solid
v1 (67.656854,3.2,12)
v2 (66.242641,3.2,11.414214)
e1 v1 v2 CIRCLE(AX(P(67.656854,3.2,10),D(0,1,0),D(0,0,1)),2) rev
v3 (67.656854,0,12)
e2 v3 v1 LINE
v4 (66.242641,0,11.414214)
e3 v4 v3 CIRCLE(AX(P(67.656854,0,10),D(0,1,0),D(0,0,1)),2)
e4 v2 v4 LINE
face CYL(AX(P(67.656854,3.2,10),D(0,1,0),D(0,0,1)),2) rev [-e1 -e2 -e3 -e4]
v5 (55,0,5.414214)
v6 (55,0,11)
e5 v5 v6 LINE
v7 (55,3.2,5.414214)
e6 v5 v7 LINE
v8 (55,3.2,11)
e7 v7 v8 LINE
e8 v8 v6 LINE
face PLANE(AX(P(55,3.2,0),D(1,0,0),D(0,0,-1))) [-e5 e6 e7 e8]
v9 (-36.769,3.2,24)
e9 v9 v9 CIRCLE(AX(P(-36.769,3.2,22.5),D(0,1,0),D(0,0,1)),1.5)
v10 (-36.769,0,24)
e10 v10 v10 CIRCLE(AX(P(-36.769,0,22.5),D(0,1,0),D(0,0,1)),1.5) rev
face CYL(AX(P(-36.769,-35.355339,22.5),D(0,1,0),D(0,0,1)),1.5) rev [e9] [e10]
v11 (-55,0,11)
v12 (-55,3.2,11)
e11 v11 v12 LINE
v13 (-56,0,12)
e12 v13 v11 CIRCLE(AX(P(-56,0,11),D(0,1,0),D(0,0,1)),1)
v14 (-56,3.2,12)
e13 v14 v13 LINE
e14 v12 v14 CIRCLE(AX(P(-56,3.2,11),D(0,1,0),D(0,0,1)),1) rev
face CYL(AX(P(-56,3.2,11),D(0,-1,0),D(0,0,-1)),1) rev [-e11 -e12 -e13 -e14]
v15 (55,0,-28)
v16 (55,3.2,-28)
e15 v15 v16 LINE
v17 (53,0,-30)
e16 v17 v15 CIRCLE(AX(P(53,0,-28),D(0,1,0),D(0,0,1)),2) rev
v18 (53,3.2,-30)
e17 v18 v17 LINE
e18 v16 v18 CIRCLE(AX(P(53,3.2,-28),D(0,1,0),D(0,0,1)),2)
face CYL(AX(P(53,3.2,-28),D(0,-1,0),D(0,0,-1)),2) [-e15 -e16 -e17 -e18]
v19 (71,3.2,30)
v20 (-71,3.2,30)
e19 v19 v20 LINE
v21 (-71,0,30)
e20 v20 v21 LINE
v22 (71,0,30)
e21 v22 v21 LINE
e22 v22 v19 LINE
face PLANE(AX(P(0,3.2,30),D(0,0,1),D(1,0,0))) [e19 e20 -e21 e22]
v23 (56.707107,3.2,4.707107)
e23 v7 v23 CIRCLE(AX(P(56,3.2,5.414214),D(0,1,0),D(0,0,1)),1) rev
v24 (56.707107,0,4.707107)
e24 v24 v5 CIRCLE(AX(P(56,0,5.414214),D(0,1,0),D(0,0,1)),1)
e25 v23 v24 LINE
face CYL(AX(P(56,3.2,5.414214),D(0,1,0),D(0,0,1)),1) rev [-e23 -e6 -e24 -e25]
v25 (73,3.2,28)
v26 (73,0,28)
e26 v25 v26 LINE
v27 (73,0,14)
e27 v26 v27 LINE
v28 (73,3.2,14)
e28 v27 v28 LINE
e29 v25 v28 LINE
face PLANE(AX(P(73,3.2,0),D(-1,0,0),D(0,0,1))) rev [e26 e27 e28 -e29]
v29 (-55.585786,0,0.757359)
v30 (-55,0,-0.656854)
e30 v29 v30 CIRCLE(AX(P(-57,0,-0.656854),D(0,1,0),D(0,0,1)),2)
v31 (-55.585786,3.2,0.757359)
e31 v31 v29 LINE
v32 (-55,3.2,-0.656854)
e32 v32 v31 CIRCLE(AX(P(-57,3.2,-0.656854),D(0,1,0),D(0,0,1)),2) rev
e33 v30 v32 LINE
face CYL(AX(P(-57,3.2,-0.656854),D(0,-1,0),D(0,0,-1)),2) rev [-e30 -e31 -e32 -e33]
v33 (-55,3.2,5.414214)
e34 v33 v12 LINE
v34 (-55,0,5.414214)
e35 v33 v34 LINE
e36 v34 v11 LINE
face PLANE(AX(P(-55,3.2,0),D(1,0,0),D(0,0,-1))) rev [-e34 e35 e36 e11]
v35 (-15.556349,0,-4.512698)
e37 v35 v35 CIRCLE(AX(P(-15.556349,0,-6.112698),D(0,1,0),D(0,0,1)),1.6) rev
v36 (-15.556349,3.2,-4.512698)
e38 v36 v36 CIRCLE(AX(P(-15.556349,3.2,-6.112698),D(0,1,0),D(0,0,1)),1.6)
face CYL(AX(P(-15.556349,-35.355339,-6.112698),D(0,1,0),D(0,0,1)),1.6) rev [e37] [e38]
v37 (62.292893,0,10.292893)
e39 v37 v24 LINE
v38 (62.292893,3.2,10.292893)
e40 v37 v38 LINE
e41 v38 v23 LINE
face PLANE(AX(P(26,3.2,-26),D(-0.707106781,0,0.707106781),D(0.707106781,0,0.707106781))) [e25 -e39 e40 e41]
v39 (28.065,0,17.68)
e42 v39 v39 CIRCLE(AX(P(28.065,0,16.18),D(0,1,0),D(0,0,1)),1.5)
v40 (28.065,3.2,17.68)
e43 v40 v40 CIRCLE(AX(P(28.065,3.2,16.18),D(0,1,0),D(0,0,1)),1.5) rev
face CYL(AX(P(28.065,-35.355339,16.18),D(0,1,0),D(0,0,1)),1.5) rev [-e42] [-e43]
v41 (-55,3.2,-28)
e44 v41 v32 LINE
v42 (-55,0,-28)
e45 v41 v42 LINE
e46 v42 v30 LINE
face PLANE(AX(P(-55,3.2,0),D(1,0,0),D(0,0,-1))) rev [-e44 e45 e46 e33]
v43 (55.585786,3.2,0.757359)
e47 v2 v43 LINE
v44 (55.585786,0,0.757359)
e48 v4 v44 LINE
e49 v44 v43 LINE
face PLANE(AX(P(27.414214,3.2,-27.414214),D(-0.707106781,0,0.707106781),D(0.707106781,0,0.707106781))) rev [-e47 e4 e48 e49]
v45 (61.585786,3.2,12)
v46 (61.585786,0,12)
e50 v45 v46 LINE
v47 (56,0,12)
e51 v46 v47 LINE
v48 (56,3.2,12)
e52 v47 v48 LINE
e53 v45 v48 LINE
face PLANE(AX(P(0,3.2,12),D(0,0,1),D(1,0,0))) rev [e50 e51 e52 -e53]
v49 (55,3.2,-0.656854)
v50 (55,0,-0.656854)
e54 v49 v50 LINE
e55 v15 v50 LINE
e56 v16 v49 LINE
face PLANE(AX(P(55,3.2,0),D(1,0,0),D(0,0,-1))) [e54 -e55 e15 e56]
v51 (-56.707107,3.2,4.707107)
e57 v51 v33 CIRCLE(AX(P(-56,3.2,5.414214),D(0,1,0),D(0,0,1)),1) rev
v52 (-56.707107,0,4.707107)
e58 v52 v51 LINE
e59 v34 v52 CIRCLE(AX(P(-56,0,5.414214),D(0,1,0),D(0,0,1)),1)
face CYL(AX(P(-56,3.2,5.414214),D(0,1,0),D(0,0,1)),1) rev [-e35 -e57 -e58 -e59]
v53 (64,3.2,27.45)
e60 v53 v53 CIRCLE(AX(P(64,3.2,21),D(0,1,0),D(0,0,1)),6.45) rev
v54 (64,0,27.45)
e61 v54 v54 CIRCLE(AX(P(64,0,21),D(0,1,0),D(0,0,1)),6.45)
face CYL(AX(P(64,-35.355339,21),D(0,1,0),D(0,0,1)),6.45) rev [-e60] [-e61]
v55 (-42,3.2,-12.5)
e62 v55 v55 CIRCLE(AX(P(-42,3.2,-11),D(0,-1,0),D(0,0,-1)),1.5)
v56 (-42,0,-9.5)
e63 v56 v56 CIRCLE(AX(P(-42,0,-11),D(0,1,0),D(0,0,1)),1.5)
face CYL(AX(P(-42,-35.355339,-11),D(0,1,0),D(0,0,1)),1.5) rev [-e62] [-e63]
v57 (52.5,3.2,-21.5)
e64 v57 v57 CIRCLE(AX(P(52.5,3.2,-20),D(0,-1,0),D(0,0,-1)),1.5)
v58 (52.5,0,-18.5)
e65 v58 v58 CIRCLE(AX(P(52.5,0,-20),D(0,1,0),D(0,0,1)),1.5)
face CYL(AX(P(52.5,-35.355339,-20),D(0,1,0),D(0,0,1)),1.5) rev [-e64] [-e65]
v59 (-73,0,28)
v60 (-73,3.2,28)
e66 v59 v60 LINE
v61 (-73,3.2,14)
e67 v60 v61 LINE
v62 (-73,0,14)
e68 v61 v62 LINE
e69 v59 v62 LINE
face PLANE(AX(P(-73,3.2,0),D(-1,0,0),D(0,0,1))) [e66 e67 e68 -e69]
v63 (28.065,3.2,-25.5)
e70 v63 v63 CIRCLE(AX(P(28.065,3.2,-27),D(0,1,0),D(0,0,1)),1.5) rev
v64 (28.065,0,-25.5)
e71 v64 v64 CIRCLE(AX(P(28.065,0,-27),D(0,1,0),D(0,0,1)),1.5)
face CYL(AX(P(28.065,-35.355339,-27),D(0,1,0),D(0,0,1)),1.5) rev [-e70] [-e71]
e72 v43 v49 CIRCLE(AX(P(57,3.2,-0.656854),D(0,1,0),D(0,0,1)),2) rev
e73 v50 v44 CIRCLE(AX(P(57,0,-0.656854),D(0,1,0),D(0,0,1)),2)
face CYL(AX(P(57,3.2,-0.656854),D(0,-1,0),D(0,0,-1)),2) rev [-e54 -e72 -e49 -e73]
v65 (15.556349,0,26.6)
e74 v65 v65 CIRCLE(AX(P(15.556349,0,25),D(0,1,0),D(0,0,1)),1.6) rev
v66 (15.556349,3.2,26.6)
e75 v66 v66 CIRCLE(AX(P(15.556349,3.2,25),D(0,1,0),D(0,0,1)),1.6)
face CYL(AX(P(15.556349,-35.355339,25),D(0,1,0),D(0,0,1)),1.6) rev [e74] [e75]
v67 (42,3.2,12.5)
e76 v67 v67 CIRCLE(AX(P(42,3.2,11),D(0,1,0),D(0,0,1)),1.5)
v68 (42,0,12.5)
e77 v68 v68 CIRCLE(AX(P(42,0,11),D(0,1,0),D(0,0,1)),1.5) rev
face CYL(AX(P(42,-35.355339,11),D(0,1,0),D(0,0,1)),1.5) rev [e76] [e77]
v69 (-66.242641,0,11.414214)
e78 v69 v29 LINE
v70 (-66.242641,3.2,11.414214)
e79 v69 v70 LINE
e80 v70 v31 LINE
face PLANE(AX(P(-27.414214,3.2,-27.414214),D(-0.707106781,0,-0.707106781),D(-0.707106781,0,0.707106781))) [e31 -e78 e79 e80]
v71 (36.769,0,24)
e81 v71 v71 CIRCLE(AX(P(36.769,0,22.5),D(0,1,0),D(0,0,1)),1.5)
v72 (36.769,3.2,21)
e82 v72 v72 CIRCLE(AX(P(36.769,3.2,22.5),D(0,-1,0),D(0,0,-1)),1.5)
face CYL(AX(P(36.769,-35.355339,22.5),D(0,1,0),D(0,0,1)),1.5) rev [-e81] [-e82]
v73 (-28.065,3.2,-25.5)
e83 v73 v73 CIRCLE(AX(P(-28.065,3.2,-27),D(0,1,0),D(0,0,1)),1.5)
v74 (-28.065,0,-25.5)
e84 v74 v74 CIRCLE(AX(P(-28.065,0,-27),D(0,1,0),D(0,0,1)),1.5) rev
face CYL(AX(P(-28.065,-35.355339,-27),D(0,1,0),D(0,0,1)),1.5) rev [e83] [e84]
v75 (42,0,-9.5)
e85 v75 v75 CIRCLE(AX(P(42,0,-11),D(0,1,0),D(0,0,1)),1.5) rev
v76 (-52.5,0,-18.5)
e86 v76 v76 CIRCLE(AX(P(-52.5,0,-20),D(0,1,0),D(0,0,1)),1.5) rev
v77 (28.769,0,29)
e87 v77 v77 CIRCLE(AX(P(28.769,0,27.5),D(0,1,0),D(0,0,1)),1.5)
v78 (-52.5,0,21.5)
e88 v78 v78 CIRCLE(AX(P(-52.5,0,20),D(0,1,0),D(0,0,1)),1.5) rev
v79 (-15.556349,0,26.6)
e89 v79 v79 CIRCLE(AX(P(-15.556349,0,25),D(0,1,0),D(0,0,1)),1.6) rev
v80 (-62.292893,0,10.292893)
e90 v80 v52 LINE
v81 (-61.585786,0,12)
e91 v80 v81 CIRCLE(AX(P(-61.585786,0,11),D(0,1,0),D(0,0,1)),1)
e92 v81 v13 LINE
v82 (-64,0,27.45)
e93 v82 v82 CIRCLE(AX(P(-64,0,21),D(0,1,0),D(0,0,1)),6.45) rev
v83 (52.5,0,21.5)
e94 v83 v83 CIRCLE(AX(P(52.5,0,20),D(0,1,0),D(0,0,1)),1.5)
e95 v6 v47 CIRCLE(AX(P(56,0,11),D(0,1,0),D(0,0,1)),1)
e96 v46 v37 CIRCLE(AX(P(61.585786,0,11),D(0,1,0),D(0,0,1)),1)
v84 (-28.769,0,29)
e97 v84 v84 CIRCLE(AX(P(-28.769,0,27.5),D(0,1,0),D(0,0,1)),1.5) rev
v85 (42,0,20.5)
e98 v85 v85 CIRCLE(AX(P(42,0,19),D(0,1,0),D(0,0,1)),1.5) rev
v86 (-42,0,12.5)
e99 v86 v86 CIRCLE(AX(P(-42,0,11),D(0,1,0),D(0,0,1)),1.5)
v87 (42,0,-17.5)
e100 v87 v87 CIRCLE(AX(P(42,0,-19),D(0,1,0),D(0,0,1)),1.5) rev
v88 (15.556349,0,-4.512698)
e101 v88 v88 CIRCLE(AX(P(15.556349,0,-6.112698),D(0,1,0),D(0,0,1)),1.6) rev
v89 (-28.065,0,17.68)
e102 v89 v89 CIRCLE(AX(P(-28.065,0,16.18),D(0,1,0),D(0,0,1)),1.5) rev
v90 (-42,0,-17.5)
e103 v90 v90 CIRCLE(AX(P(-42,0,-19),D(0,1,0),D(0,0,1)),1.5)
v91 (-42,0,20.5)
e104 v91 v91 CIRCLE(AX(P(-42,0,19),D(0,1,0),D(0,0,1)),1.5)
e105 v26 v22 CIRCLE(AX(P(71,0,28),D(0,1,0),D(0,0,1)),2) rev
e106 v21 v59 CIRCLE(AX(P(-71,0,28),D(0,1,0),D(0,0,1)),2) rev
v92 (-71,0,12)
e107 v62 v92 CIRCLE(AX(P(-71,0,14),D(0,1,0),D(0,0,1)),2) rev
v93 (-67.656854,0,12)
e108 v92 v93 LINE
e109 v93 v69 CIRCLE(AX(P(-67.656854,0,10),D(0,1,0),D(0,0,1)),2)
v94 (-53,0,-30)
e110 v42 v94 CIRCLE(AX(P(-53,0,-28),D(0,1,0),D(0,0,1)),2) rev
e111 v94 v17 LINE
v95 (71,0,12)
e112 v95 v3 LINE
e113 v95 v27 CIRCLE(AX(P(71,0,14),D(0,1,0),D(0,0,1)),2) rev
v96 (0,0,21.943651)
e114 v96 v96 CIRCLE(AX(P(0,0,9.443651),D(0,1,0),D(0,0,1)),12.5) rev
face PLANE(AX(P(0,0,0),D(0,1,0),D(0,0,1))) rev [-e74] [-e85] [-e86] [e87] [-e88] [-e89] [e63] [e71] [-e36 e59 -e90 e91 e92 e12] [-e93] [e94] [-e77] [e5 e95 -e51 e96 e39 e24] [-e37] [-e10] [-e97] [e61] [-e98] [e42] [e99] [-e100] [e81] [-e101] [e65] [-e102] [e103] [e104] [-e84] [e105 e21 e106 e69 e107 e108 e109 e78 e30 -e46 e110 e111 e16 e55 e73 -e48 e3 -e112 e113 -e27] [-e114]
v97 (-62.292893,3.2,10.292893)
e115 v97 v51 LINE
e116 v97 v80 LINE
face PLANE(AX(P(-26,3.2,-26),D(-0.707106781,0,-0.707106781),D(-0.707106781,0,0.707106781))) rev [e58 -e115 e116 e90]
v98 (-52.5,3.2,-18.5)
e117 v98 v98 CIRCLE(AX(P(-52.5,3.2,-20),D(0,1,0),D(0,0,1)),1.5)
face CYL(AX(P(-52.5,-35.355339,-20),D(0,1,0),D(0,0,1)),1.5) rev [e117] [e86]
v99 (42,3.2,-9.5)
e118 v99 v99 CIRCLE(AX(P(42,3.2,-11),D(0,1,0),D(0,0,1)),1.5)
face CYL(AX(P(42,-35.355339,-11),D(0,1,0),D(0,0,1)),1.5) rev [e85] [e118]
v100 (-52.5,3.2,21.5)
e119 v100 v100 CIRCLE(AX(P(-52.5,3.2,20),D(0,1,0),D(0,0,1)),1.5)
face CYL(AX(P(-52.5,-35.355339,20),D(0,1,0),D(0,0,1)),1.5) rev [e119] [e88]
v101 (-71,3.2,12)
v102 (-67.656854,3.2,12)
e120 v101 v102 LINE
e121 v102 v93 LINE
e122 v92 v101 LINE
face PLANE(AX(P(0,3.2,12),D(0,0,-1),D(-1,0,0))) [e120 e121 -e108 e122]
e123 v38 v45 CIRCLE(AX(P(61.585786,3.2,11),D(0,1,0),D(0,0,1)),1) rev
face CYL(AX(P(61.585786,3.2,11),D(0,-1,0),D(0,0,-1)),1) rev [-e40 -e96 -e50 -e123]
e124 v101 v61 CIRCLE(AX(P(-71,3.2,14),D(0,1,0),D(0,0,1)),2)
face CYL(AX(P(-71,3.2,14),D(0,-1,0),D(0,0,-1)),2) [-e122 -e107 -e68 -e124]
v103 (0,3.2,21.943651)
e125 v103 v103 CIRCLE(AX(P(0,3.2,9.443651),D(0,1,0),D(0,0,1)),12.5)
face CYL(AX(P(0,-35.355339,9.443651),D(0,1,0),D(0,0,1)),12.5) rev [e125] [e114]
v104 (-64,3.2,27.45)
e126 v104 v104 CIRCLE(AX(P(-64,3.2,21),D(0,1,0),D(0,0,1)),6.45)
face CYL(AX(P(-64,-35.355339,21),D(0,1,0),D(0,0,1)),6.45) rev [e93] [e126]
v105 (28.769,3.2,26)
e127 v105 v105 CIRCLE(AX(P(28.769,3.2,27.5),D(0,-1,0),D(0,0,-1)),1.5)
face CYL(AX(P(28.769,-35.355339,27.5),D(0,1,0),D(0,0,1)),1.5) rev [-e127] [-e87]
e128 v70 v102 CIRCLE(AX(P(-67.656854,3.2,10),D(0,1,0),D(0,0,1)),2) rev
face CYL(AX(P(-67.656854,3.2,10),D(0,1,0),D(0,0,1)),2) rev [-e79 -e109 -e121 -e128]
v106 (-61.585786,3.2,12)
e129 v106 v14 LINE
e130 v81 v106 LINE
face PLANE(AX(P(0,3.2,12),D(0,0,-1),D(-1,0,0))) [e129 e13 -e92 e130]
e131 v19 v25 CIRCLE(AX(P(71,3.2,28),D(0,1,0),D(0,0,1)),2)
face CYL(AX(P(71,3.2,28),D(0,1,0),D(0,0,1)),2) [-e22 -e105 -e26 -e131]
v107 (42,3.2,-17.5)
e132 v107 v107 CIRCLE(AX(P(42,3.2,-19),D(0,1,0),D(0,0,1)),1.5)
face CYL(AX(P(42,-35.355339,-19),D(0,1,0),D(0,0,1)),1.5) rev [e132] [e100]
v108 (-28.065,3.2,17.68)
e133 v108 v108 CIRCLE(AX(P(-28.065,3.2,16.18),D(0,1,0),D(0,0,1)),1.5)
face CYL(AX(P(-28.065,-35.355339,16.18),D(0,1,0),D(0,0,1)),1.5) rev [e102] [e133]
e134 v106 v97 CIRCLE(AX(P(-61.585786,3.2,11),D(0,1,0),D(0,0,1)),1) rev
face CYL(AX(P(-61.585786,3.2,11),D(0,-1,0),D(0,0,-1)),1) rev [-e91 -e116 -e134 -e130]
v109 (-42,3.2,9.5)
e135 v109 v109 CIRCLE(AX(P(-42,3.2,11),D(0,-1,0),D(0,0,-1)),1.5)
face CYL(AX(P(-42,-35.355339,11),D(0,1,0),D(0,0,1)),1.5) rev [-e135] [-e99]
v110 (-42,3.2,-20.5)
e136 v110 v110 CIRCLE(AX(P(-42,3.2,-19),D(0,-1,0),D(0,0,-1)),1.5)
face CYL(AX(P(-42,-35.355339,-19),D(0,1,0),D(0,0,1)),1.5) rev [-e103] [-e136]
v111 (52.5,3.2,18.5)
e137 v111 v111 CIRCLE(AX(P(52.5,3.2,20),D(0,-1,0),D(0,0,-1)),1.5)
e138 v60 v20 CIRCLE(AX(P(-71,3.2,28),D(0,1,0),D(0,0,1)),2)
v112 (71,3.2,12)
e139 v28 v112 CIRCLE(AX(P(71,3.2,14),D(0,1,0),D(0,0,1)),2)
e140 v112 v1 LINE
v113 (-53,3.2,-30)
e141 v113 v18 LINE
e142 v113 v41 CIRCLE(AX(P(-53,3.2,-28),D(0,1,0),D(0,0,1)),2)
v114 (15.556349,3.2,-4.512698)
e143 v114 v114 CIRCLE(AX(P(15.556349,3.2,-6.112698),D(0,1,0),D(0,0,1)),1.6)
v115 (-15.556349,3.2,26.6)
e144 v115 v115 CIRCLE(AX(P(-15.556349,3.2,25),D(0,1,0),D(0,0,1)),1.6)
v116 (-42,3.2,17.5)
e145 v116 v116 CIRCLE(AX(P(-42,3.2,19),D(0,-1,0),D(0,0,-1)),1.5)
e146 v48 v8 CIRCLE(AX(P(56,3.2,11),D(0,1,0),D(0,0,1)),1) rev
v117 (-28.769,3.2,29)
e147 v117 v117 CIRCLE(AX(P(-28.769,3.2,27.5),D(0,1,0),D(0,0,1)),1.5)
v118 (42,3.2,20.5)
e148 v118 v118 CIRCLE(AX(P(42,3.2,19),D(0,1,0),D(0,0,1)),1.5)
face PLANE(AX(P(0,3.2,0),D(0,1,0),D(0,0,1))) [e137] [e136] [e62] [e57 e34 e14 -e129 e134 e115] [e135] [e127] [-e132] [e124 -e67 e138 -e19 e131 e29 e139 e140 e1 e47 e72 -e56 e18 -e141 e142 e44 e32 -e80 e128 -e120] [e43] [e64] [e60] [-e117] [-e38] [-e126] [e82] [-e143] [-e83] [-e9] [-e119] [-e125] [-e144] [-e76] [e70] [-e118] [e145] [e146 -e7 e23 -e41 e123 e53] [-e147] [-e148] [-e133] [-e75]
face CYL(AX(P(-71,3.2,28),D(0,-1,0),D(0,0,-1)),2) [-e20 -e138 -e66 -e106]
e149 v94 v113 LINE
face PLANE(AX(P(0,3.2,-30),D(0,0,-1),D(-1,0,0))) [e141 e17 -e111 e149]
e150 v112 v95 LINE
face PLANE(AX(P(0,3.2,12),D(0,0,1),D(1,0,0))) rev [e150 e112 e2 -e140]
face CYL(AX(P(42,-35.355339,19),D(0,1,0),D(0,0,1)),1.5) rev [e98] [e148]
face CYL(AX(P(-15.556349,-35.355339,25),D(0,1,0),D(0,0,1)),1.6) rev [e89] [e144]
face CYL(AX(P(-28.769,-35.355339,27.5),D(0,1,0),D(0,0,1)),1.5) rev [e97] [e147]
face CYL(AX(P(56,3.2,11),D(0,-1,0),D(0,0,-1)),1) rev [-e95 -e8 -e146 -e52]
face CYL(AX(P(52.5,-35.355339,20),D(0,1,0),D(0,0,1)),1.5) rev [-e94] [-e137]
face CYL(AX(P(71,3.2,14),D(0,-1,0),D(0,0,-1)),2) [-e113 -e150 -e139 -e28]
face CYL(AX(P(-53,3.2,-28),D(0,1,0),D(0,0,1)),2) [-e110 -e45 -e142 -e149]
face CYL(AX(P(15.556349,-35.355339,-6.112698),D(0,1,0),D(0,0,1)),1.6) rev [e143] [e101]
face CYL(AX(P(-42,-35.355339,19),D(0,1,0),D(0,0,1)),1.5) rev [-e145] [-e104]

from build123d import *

# Parameters (mm, degrees)
EXTRUDE_1_DEPTH     = 3.2
SKETCH_2_R          = 12.5
SKETCH_2_R_2        = 1.6
SKETCH_2_R_3        = 1.5
SKETCH_2_R_4        = 6.45
CUT_EXTRUDE_1_DEPTH = 3.2
FILLET_1_R          = 2
FILLET_2_R          = 1


# Read off the part's stored shape, not the designer's step: 凸台-拉伸1
with BuildPart() as part:
    # 凸台-拉伸1 outline → 凸台-拉伸1 (new body)
    with BuildSketch(Plane(origin=(0, 0, 0), x_dir=(1, 0, 0), z_dir=(0, 1, 0))):
        Polygon((-55, -0.171572875), (-66.828427125, -12), (-73, -12), (-73, -30), (73, -30), (73, -12), (66.828427125, -12), (55, -0.171572875), (55, 30), (-55, 30), align=None)
        Polygon((-64, -12), (-55, -3), (-55, -12), align=None, mode=Mode.SUBTRACT)
        Polygon((55, -12), (55, -3), (64, -12), align=None, mode=Mode.SUBTRACT)
    extrude(amount=EXTRUDE_1_DEPTH)

    # 草图2 → 切除-拉伸1 (cut)
    with BuildSketch(Plane(origin=(0, 3.2, 0), x_dir=(1, 0, 0), z_dir=(0, 1, 0))):
        with Locations(Location((0, -9.443650814, 0), (0, 0, 270))):
            Circle(SKETCH_2_R)
        with Locations(Location((15.556349186, -25, 0), (0, 0, 270))):
            Circle(SKETCH_2_R_2)
        with Locations(Location((15.556349186, 6.112698372, 0), (0, 0, 270))):
            Circle(SKETCH_2_R_2)
        with Locations(Location((-15.556349186, 6.112698372, 0), (0, 0, 270))):
            Circle(SKETCH_2_R_2)
        with Locations(Location((-15.556349186, -25, 0), (0, 0, 270))):
            Circle(SKETCH_2_R_2)
        with Locations(Location((-52.5, 20, 0), (0, 0, 270))):
            Circle(SKETCH_2_R_3)
        with Locations(Location((-52.5, -20, 0), (0, 0, 270))):
            Circle(SKETCH_2_R_3)
        with Locations(Location((52.5, -20, 0), (0, 0, 270))):
            Circle(SKETCH_2_R_3)
        with Locations(Location((52.5, 20, 0), (0, 0, 270))):
            Circle(SKETCH_2_R_3)
        with Locations(Location((-64, -21, 0), (0, 0, 270))):
            Circle(SKETCH_2_R_4)
        with Locations(Location((64, -21, 0), (0, 0, 270))):
            Circle(SKETCH_2_R_4)
        with Locations(Location((42, 19, 0), (0, 0, 270))):
            Circle(SKETCH_2_R_3)
        with Locations(Location((42, 11, 0), (0, 0, 270))):
            Circle(SKETCH_2_R_3)
        with Locations(Location((-42, 11, 0), (0, 0, 270))):
            Circle(SKETCH_2_R_3)
        with Locations(Location((-42, 19, 0), (0, 0, 270))):
            Circle(SKETCH_2_R_3)
        with Locations(Location((42, -11, 0), (0, 0, 270))):
            Circle(SKETCH_2_R_3)
        with Locations(Location((42, -19, 0), (0, 0, 270))):
            Circle(SKETCH_2_R_3)
        with Locations(Location((-42, -19, 0), (0, 0, 270))):
            Circle(SKETCH_2_R_3)
        with Locations(Location((-42, -11, 0), (0, 0, 270))):
            Circle(SKETCH_2_R_3)
        with Locations(Location((-28.065, 27, 0), (0, 0, 270))):
            Circle(SKETCH_2_R_3)
        with Locations(Location((28.065, 27, 0), (0, 0, 270))):
            Circle(SKETCH_2_R_3)
        with Locations(Location((-28.065, -16.18, 0), (0, 0, 270))):
            Circle(SKETCH_2_R_3)
        with Locations(Location((28.065, -16.18, 0), (0, 0, 270))):
            Circle(SKETCH_2_R_3)
        with Locations(Location((-28.769, -27.5, 0), (0, 0, 270))):
            Circle(SKETCH_2_R_3)
        with Locations(Location((28.769, -27.5, 0), (0, 0, 270))):
            Circle(SKETCH_2_R_3)
        with Locations(Location((-36.769, -22.5, 0), (0, 0, 270))):
            Circle(SKETCH_2_R_3)
        with Locations(Location((36.769, -22.5, 0), (0, 0, 270))):
            Circle(SKETCH_2_R_3)
    extrude(amount=-CUT_EXTRUDE_1_DEPTH, mode=Mode.SUBTRACT)

    # 圆角1
    fillet_1_edges = [part.edges().sort_by_distance(p)[0] for p in [
        (-66.828427125, 1.6, 12),
        (-55, 1.6, 0.171572875),
        (-55, 1.6, -30),
        (55, 1.6, -30),
        (55, 1.6, 0.171572875),
        (66.828427125, 1.6, 12),
        (73, 1.6, 12),
        (73, 1.6, 30),
        (-73, 1.6, 30),
        (-73, 1.6, 12),
    ]]
    fillet(fillet_1_edges, radius=FILLET_1_R)

    # 圆角2
    fillet_2_edges = [part.edges().sort_by_distance(p)[0] for p in [
        (-64, 1.6, 12),
        (-55, 1.6, 12),
        (-55, 1.6, 3),
        (55, 1.6, 3),
        (55, 1.6, 12),
        (64, 1.6, 12),
    ]]
    fillet(fillet_2_edges, radius=FILLET_2_R)


solid = part.part
